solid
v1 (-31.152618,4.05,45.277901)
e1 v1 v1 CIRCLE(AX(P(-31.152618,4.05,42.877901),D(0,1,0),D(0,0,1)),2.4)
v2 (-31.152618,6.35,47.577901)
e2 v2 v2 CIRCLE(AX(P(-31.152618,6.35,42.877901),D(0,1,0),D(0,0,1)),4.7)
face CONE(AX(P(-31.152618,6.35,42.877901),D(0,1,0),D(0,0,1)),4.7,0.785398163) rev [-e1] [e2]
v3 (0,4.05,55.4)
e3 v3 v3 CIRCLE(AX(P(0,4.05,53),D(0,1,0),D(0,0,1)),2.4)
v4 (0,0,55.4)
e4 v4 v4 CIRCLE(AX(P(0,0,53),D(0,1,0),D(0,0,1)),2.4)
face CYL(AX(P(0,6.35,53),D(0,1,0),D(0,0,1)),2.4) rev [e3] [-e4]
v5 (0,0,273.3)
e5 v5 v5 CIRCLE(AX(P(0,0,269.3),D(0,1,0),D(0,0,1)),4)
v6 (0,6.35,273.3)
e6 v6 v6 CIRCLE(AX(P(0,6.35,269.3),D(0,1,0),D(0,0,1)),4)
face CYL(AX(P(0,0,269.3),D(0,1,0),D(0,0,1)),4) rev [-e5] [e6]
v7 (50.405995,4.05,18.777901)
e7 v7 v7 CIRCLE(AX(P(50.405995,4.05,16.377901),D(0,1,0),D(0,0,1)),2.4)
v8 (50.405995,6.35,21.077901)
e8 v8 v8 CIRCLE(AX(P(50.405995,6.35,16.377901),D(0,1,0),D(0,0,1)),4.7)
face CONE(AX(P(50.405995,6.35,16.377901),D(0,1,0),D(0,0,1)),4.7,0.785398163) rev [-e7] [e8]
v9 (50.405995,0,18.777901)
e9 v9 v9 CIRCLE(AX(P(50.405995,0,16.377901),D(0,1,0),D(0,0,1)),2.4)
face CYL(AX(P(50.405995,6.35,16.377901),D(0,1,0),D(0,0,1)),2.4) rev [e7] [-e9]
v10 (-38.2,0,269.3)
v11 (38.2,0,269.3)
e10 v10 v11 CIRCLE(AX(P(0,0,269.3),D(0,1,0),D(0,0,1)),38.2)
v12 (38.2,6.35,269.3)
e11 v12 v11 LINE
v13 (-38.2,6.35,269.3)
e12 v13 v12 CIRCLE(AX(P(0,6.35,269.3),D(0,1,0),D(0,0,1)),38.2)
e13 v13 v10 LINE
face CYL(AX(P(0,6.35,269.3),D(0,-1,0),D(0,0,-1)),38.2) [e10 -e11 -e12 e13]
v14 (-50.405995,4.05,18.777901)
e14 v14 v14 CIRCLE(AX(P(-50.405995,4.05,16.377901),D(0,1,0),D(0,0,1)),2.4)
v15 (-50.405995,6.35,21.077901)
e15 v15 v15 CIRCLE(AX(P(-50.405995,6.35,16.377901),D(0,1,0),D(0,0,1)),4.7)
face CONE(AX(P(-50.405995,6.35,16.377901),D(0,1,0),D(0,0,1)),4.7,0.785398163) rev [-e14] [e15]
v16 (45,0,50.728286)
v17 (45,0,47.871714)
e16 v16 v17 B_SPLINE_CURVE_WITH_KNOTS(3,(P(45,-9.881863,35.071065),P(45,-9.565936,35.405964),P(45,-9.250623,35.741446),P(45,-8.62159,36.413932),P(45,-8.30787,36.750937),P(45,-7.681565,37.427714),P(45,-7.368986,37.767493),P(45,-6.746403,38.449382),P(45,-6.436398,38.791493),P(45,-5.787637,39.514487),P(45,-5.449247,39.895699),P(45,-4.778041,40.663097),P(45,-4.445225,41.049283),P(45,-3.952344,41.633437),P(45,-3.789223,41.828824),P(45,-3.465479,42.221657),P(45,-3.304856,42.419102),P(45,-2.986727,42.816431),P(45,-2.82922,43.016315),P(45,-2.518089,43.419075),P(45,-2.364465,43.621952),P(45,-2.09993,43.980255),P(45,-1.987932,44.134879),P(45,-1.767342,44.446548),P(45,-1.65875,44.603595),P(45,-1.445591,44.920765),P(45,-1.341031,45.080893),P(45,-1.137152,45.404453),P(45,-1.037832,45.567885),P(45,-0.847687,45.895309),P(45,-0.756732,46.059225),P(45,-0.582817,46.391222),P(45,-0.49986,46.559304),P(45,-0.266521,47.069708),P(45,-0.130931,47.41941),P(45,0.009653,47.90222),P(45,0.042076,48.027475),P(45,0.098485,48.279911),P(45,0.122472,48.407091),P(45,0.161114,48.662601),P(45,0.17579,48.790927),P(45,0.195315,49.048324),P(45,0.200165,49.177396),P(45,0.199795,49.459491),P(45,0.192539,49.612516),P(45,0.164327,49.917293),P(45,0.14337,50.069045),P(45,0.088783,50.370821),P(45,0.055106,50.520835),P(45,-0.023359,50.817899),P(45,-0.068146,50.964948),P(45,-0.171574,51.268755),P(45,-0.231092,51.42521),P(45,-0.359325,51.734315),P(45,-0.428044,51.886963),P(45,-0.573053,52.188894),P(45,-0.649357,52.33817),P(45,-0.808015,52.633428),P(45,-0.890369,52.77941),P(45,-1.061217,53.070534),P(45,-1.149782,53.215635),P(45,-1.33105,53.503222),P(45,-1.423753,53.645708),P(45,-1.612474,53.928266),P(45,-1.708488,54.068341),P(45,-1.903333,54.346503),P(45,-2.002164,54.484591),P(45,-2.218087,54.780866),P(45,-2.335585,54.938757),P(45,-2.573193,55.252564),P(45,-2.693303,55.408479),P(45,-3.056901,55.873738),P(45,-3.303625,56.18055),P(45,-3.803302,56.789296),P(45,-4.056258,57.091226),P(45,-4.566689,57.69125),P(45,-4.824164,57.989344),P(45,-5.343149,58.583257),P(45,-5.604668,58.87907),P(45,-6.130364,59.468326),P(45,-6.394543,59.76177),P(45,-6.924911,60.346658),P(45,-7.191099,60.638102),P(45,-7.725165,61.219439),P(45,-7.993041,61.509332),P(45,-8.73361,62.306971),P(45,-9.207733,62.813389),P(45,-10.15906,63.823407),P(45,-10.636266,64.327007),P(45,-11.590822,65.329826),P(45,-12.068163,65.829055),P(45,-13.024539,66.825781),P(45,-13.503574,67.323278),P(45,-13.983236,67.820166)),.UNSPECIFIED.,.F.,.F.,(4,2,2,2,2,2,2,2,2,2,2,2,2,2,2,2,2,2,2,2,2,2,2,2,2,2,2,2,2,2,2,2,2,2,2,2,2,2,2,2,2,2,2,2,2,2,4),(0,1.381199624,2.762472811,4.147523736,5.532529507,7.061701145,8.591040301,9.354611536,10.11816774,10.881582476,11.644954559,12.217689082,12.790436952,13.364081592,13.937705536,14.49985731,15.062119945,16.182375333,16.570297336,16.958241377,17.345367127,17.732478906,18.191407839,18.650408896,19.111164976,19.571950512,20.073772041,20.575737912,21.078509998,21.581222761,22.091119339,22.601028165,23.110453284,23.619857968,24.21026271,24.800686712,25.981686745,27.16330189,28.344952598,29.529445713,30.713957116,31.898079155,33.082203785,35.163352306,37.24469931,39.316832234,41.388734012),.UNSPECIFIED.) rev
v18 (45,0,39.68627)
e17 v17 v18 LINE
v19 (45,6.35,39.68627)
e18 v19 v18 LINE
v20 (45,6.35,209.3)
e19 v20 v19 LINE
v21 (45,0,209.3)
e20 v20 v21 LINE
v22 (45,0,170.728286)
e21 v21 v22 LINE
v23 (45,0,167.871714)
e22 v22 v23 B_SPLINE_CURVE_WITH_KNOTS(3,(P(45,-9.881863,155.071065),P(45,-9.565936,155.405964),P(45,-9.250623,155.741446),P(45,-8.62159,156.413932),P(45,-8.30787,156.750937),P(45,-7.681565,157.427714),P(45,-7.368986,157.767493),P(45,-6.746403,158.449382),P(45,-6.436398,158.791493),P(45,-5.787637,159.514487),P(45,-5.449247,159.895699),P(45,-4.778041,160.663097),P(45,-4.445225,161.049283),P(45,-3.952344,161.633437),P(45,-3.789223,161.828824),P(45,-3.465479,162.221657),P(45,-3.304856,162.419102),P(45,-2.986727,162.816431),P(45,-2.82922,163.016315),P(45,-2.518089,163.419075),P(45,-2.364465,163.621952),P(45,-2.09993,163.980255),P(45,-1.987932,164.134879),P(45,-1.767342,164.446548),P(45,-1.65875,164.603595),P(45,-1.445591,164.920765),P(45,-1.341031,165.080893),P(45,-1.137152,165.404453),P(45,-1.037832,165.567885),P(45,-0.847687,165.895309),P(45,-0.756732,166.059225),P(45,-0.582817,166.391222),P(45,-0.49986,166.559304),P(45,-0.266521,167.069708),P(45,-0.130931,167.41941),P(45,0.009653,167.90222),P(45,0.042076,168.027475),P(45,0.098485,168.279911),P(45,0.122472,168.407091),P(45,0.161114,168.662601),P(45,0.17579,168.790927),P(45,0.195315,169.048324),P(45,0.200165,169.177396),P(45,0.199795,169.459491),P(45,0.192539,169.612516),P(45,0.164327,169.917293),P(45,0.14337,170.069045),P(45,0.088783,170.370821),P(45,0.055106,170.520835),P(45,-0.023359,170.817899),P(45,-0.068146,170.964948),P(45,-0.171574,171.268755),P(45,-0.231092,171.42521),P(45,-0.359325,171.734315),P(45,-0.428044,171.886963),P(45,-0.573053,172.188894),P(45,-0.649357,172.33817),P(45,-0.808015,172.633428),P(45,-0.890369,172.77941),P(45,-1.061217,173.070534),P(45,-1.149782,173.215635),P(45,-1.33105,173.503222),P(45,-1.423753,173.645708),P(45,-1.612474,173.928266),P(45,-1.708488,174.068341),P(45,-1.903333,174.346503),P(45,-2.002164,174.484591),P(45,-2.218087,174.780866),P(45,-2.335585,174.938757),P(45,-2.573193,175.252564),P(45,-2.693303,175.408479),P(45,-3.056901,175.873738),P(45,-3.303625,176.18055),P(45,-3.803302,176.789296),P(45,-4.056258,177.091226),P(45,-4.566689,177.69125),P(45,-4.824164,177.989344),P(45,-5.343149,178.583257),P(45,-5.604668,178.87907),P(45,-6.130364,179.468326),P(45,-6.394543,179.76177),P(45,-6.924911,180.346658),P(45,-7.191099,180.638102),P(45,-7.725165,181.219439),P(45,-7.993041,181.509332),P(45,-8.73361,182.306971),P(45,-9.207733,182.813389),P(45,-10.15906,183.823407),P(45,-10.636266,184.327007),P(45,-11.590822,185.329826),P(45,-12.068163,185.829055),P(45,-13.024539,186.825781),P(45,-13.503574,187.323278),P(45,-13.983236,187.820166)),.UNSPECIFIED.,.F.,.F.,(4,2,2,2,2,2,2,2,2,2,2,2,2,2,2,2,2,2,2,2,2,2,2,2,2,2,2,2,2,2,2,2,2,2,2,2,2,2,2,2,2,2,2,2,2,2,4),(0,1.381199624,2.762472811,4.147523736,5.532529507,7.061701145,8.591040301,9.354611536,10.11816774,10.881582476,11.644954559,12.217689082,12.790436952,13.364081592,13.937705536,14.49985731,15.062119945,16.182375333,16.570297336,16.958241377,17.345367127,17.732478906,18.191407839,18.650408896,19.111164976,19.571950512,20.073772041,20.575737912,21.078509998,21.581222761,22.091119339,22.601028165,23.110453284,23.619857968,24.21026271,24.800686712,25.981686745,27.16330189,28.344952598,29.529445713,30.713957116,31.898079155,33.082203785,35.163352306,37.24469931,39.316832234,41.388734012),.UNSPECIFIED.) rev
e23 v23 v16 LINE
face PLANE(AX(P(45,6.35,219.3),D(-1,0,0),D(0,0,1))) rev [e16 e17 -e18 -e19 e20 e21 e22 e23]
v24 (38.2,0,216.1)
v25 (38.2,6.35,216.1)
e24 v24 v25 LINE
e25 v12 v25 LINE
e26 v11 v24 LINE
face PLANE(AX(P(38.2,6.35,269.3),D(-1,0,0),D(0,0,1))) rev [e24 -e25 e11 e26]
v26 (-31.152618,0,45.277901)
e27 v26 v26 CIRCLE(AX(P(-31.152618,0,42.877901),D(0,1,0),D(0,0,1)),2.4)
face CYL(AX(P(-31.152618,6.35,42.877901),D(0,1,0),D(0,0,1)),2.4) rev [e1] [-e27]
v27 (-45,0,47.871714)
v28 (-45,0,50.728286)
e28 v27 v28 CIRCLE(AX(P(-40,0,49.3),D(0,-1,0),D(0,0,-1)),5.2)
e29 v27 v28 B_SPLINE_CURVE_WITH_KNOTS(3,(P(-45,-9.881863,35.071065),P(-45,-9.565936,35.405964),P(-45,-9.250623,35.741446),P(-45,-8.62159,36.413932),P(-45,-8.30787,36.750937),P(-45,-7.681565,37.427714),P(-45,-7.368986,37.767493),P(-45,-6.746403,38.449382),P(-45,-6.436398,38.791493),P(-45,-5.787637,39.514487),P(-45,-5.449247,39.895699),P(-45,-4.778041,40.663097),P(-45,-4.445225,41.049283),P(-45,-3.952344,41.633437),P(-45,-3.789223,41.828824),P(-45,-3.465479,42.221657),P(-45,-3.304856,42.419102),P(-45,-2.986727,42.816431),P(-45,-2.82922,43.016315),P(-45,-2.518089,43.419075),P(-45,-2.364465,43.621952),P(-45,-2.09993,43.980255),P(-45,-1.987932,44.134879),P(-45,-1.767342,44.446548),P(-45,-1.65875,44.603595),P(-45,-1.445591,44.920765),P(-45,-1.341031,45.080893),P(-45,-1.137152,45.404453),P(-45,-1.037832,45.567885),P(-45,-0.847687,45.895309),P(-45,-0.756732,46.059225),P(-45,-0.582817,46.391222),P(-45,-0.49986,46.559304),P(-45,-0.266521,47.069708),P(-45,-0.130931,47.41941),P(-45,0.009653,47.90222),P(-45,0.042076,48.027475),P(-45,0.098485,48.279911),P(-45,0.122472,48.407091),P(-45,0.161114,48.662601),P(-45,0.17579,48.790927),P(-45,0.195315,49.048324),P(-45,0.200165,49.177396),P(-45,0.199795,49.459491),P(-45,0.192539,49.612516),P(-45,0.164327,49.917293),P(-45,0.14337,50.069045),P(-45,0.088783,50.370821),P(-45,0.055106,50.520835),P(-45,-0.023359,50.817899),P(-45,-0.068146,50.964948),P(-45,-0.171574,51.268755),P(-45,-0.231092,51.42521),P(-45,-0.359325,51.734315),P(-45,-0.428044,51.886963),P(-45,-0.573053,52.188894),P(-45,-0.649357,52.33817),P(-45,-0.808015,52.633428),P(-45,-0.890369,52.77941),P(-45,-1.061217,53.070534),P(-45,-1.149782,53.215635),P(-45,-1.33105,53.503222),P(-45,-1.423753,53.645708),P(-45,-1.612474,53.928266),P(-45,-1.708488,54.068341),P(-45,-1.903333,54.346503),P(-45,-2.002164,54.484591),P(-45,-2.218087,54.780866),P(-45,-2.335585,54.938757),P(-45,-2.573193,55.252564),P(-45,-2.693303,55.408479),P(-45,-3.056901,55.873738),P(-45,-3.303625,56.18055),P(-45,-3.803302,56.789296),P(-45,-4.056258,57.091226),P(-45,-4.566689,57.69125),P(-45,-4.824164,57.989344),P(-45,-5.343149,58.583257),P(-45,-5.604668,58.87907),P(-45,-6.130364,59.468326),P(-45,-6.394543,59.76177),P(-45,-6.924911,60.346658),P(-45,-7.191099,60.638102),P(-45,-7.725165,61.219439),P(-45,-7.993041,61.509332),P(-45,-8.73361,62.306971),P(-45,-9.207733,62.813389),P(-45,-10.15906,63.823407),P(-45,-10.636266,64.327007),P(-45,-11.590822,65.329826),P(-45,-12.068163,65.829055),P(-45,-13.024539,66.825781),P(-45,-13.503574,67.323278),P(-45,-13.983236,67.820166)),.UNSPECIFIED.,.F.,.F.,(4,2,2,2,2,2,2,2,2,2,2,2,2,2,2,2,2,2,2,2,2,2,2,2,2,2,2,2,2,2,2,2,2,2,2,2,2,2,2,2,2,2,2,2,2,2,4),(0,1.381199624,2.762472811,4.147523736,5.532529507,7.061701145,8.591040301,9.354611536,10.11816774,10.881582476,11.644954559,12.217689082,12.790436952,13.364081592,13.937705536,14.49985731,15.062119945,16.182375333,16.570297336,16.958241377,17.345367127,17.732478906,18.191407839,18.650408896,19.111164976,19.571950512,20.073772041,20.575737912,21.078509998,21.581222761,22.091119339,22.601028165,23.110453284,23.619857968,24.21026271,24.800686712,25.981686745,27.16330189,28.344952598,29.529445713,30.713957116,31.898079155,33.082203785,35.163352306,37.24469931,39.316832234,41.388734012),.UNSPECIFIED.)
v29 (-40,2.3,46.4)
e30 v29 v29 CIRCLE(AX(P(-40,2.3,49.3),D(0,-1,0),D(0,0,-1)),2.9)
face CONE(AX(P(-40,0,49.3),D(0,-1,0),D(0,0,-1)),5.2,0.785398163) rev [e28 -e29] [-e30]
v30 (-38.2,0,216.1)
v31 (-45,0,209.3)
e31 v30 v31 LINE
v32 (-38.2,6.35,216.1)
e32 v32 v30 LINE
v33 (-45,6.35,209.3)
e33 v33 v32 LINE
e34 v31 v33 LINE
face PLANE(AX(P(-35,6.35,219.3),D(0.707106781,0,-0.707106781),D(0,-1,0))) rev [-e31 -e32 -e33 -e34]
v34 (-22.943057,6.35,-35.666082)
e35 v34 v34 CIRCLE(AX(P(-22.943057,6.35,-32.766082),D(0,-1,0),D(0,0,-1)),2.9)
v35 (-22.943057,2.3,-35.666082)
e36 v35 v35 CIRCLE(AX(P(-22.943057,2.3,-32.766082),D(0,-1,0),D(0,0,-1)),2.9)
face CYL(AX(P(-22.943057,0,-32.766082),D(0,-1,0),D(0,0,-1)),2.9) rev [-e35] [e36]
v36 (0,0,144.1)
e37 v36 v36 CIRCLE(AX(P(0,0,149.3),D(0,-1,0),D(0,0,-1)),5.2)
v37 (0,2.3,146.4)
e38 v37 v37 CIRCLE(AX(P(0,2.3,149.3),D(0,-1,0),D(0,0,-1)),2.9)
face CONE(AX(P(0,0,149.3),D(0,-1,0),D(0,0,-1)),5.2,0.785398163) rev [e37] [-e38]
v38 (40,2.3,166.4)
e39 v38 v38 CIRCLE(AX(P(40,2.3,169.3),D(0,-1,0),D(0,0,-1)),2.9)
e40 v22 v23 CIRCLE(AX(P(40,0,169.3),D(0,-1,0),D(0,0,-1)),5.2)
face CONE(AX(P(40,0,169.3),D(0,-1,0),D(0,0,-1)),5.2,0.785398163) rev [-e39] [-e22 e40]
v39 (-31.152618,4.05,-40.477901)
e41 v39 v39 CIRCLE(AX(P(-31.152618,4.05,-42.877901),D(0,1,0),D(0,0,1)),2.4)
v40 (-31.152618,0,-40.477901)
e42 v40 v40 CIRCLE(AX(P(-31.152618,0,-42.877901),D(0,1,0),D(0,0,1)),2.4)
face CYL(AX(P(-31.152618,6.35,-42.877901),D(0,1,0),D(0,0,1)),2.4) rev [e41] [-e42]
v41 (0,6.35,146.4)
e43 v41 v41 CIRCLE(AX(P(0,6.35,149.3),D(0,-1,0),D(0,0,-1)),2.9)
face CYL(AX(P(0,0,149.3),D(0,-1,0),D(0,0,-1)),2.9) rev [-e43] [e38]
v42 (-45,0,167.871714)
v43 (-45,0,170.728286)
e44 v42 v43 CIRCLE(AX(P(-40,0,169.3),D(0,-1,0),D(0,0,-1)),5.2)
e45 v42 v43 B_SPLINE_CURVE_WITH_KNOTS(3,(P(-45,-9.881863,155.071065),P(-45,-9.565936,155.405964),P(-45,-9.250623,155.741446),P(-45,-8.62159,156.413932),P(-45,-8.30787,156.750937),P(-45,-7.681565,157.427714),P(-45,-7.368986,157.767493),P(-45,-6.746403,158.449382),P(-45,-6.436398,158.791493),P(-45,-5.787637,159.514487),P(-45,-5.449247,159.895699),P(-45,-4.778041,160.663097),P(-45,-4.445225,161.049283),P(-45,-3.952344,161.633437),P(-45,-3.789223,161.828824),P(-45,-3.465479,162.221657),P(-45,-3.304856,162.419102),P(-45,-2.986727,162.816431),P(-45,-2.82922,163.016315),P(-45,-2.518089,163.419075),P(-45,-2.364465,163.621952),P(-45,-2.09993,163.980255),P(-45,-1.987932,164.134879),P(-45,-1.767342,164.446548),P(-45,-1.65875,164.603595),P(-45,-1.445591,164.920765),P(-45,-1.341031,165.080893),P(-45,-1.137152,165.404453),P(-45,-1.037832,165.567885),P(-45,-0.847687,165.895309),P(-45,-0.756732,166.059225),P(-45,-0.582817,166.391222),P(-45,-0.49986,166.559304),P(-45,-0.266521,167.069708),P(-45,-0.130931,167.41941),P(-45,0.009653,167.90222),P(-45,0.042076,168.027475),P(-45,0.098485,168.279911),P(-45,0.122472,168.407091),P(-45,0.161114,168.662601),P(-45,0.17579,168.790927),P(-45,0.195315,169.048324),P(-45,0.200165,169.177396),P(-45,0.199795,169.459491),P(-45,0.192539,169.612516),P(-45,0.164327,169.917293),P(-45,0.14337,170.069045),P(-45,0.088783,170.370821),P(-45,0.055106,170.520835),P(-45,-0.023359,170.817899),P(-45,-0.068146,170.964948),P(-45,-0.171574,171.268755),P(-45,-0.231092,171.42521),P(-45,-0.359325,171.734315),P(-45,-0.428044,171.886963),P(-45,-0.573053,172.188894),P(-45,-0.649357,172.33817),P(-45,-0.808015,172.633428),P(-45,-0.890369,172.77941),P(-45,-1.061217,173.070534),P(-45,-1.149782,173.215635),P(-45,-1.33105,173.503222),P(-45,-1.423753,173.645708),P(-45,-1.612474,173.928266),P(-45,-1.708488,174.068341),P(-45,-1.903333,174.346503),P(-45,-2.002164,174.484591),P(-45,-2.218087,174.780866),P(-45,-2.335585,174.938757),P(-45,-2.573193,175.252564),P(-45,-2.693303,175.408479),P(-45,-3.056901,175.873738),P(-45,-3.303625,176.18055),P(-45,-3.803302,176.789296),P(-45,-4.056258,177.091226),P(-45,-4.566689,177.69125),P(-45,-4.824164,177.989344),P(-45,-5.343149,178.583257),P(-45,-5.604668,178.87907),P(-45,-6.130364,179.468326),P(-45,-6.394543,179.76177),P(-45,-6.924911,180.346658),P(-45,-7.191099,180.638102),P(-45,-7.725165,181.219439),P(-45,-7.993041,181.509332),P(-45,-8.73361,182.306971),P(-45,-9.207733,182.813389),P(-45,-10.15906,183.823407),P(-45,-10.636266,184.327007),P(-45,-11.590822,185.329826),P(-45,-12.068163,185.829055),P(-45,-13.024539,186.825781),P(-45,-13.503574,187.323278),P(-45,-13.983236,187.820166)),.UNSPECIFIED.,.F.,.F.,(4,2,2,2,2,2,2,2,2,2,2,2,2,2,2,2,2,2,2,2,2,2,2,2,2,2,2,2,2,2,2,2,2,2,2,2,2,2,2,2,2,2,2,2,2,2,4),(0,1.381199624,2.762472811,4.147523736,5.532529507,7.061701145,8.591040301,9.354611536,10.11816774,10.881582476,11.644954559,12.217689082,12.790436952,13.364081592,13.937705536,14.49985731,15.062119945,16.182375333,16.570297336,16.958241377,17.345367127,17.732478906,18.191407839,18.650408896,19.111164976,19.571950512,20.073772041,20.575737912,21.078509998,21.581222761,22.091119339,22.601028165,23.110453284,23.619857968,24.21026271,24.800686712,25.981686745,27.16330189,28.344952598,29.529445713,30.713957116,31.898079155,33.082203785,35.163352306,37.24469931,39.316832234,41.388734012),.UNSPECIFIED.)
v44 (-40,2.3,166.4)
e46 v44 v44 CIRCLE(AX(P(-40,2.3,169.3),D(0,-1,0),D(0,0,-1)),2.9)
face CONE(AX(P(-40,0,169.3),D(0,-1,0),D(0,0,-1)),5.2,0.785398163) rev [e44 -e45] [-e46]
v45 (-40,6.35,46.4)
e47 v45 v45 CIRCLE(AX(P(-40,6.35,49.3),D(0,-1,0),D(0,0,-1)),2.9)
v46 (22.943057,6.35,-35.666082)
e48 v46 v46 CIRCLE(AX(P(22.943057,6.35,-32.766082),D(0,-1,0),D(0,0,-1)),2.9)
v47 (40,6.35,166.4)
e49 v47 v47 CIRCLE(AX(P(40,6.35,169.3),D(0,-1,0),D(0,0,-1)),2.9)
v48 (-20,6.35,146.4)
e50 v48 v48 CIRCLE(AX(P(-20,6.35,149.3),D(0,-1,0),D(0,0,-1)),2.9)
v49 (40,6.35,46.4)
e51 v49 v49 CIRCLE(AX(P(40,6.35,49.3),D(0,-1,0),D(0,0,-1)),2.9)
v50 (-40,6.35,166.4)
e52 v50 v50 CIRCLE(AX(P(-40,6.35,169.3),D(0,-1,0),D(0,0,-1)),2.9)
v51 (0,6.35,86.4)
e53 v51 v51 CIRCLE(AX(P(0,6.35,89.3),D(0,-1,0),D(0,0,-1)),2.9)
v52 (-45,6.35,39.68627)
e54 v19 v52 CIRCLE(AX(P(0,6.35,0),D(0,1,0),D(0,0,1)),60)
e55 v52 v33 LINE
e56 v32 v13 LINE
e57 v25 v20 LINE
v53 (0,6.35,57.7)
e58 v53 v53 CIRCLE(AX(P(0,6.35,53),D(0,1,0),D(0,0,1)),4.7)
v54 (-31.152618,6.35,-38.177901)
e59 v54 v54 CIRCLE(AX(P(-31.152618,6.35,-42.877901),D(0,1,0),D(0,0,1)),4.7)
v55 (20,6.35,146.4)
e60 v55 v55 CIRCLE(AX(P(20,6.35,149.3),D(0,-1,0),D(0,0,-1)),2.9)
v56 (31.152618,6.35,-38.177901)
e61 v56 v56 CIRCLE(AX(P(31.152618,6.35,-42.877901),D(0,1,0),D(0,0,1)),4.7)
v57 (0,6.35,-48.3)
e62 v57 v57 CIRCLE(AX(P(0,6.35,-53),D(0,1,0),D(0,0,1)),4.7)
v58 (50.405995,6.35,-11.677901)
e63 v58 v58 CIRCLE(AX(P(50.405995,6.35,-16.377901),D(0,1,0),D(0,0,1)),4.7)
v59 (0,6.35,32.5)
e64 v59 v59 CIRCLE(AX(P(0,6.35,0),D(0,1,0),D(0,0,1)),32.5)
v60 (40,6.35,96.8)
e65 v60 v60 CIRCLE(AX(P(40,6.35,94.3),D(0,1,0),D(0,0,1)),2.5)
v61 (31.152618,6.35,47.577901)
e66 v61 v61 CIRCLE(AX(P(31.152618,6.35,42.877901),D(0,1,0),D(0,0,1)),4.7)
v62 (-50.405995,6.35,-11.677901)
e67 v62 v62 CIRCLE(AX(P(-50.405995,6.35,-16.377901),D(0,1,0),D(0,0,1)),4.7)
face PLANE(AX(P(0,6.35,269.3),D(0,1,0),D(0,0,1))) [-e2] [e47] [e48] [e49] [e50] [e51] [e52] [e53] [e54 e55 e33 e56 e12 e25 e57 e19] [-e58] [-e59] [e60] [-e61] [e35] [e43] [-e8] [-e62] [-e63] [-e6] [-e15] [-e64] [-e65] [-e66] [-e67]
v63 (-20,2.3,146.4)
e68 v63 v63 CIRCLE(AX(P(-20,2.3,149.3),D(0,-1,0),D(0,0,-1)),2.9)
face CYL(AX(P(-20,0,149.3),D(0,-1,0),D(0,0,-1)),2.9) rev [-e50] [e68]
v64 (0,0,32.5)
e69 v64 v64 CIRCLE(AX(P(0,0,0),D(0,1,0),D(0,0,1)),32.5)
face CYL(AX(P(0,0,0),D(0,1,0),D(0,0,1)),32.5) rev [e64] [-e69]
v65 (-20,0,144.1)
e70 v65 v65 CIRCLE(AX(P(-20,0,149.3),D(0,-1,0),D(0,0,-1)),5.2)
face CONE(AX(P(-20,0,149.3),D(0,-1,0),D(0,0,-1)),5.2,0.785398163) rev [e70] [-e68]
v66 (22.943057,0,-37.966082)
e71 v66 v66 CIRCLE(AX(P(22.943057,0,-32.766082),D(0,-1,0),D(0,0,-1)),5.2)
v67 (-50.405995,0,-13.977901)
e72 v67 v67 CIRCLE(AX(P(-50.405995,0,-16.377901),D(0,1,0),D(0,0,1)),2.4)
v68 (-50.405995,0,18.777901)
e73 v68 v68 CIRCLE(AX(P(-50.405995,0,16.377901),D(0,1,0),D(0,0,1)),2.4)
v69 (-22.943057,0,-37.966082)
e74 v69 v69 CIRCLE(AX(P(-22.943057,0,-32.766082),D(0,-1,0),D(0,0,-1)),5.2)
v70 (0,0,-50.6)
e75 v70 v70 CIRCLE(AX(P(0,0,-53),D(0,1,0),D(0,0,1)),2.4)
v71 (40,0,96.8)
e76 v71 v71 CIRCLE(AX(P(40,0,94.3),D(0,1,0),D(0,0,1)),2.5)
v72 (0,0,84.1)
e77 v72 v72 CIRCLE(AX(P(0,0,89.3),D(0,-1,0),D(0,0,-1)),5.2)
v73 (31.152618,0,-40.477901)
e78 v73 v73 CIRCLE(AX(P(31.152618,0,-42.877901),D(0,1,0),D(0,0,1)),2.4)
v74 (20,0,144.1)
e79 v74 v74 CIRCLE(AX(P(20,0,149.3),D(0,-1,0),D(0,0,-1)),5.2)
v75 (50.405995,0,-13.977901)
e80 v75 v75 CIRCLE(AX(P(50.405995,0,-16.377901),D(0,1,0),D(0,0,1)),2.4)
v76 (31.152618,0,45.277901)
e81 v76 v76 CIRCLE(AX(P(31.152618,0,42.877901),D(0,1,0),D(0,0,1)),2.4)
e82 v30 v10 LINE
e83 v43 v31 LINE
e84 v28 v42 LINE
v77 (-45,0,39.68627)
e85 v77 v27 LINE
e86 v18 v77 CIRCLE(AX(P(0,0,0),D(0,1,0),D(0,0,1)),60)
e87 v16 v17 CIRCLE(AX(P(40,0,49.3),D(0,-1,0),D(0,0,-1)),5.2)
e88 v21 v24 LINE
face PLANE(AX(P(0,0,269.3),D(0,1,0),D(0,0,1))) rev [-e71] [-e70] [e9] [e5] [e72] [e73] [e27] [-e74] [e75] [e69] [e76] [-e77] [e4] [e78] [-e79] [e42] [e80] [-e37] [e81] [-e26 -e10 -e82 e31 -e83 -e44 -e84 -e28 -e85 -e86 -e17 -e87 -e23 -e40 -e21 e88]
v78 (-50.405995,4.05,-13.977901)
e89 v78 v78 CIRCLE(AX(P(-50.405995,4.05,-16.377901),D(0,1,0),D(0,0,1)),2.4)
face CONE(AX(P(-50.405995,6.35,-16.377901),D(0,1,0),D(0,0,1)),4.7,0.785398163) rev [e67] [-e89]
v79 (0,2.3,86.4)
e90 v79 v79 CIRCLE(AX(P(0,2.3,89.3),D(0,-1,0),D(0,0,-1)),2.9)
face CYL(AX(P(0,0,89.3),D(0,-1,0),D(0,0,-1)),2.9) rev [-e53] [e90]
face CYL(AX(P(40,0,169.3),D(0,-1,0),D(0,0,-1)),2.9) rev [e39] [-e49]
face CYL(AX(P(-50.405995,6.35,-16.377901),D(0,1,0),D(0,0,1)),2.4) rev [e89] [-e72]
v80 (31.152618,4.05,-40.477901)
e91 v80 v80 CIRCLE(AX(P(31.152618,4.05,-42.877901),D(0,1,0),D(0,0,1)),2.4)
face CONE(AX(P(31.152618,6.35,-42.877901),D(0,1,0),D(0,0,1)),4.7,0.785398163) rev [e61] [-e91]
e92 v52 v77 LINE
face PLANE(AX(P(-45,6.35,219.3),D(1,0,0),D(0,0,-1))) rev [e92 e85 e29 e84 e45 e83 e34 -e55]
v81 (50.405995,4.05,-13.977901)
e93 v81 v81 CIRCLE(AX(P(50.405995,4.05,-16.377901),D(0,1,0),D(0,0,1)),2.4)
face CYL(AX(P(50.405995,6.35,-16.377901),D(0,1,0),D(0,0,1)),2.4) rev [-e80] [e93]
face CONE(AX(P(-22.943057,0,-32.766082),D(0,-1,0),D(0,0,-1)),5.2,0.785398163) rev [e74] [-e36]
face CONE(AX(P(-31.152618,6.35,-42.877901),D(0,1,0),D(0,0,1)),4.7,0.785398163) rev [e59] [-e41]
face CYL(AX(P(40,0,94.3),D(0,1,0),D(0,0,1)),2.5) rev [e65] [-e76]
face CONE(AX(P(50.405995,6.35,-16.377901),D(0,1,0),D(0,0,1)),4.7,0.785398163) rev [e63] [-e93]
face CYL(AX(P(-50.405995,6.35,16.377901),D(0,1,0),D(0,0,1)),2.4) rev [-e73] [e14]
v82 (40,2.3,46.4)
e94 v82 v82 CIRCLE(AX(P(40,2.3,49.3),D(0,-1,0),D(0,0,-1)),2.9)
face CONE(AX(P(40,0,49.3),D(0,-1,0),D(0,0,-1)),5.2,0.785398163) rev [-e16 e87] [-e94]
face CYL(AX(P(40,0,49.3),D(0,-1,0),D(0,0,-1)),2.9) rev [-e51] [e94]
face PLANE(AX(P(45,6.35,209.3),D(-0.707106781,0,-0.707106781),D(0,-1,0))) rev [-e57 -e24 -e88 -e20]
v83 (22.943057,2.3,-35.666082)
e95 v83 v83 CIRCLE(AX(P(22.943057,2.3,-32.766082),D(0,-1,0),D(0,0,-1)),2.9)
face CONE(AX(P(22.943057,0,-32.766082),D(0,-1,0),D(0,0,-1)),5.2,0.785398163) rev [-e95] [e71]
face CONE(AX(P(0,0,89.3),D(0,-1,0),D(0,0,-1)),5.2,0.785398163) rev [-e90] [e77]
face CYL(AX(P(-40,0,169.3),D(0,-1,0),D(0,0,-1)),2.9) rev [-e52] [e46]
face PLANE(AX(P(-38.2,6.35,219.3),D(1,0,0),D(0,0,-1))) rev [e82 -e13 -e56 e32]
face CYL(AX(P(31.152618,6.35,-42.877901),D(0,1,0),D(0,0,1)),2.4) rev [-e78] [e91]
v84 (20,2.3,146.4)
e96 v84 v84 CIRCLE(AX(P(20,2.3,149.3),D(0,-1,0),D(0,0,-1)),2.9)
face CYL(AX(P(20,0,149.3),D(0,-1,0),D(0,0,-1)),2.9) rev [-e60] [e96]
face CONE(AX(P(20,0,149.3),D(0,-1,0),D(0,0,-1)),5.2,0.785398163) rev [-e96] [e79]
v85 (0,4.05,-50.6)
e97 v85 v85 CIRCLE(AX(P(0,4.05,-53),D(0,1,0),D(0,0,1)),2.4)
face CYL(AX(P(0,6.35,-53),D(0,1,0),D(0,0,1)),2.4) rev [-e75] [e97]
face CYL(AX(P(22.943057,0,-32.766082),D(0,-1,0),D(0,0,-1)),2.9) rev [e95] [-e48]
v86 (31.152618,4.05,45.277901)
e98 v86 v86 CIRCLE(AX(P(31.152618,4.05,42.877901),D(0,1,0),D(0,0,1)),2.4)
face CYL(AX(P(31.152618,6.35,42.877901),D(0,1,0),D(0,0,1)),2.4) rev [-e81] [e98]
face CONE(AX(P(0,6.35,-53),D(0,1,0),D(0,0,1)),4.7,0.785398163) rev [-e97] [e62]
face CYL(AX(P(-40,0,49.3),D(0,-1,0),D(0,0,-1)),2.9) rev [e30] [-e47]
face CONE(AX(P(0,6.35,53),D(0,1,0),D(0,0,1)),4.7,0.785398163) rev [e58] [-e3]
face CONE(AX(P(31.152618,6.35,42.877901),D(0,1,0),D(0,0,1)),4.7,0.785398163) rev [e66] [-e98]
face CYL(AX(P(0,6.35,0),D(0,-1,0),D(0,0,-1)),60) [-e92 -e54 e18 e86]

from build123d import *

# Parameters (mm, degrees)
BOSS_EXTRUDE1_DEPTH                             = 6.35
SKETCH2_R                                       = 2
SKETCH2_R_2                                     = 32.5
SKETCH2_R_3                                     = 4
SKETCH2_R_4                                     = 2.5
CUT_EXTRUDE1_DEPTH                              = 314.363323476
CHAMFER1_SIZE                                   = 10
CSK_FOR_M4_OVAL_HEAD_MACHINE_SCREW1_D           = 4.8
CSK_FOR_M4_OVAL_HEAD_MACHINE_SCREW1_CSINK_D     = 9.4
CSK_FOR_M4_OVAL_HEAD_MACHINE_SCREW1_CSINK_ANGLE = 90
CSK_FOR_M5_OVAL_HEAD_MACHINE_SCREW1_D           = 5.8
CSK_FOR_M5_OVAL_HEAD_MACHINE_SCREW1_CSINK_D     = 10.4
CSK_FOR_M5_OVAL_HEAD_MACHINE_SCREW1_CSINK_ANGLE = 90


with BuildPart() as part:
    # Sketch1 → Boss-Extrude1 (new body)
    with BuildSketch(Plane(origin=(0, 0, 0), x_dir=(1, 0, 0), z_dir=(0, 1, 0))):
        with BuildLine():
            Line((-45, -219.3), (-38.2, -219.3))
            Line((-38.2, -219.3), (-38.2, -269.3))
            ThreePointArc((-38.2, -269.3), (0, -307.5), (38.2, -269.3))
            Line((38.2, -269.3), (38.2, -219.3))
            Line((38.2, -219.3), (45, -219.3))
            Line((45, -219.3), (45, -39.686269666))
            ThreePointArc((45, -39.686269666), (0, 60), (-45, -39.686269666))
            Line((-45, -39.686269666), (-45, -219.3))
        make_face()
    extrude(amount=BOSS_EXTRUDE1_DEPTH)

    # Sketch2 → Cut-Extrude1 (cut, through all)
    with BuildSketch(Plane(origin=(0, 6.35, 0), x_dir=(1, 0, 0), z_dir=(0, 1, 0))):
        with Locations(Location((0, 53, 0), (0, 0, 270))):
            Circle(SKETCH2_R)
        with Locations(Location((31.152618372, 42.877900702, 0), (0, 0, 270))):
            Circle(SKETCH2_R)
        with Locations(Location((50.405995364, 16.377900702, 0), (0, 0, 270))):
            Circle(SKETCH2_R)
        with Locations(Location((50.405995364, -16.377900702, 0), (0, 0, 270))):
            Circle(SKETCH2_R)
        with Locations(Location((31.152618372, -42.877900702, 0), (0, 0, 270))):
            Circle(SKETCH2_R)
        with Locations(Location((0, -53, 0), (0, 0, 270))):
            Circle(SKETCH2_R)
        with Locations(Location((-31.152618371, -42.877900702, 0), (0, 0, 270))):
            Circle(SKETCH2_R)
        with Locations(Location((-50.405995364, -16.377900702, 0), (0, 0, 270))):
            Circle(SKETCH2_R)
        with Locations(Location((-50.405995364, 16.377900702, 0), (0, 0, 270))):
            Circle(SKETCH2_R)
        with Locations(Location((-31.152618371, 42.877900702, 0), (0, 0, 270))):
            Circle(SKETCH2_R)
        with Locations(Location((0, 0, 0), (0, 0, 270))):
            Circle(SKETCH2_R_2)
        with Locations(Location((0, -269.3, 0), (0, 0, 270))):
            Circle(SKETCH2_R_3)
        with Locations(Location((-40, -169.3, 0), (0, 0, 270))):
            Circle(SKETCH2_R_4)
        with Locations(Location((-40, -49.3, 0), (0, 0, 270))):
            Circle(SKETCH2_R_4)
        with Locations(Location((40, -169.3, 0), (0, 0, 90))):
            Circle(SKETCH2_R_4)
        with Locations(Location((40, -49.3, 0), (0, 0, 90))):
            Circle(SKETCH2_R_4)
        with Locations(Location((0, -89.3, 0), (0, 0, 270))):
            Circle(SKETCH2_R_4)
        with Locations(Location((-20, -149.3, 0), (0, 0, 270))):
            Circle(SKETCH2_R_4)
        with Locations(Location((0, -149.3, 0), (0, 0, 270))):
            Circle(SKETCH2_R_4)
        with Locations(Location((20, -149.3, 0), (0, 0, 270))):
            Circle(SKETCH2_R_4)
        with Locations(Location((-22.943057454, 32.766081772, 0), (0, 0, 270))):
            Circle(SKETCH2_R_4)
        with Locations(Location((22.943057454, 32.766081772, 0), (0, 0, 270))):
            Circle(SKETCH2_R_4)
        with Locations(Location((40, -94.3, 0), (0, 0, 270))):
            Circle(SKETCH2_R_4)
    extrude(amount=-CUT_EXTRUDE1_DEPTH, mode=Mode.SUBTRACT)

    # Chamfer1
    # the kernel refuses this chamfer: 10 mm, written as the material it takes off along each edge
    with BuildSketch(Plane(origin=(45, -25.71682988, 219.3), x_dir=(0.027495876610586282, 0, -0.9996219169112968), z_dir=(0, 1, 0))) as chamfer1_piece_1_section:
        Polygon((CHAMFER1_SIZE * 0.999621916911, CHAMFER1_SIZE * 0.0274958766106), (-CHAMFER1_SIZE * 0.0274958766106, CHAMFER1_SIZE * 0.999621916911), (0, 0), align=None)
    chamfer1_piece_1 = extrude(amount=57.783659759, mode=Mode.PRIVATE)
    chamfer1_piece_1 = split(chamfer1_piece_1, bisect_by=Plane(origin=(38.2, 3.175, 215.680305009), z_dir=(1, 0, 0)), keep=Keep.TOP, mode=Mode.PRIVATE)
    add(chamfer1_piece_1, mode=Mode.SUBTRACT)
    with BuildSketch(Plane(origin=(-45, -25.71682988, 219.3), x_dir=(-0.027495876610586282, 0, -0.9996219169112968), z_dir=(0, 1, 0))) as chamfer1_piece_2_section:
        Polygon((CHAMFER1_SIZE * 0.999621916911, -CHAMFER1_SIZE * 0.0274958766106), (-CHAMFER1_SIZE * 0.0274958766106, -CHAMFER1_SIZE * 0.999621916911), (0, 0), align=None)
    chamfer1_piece_2 = extrude(amount=57.783659759, mode=Mode.PRIVATE)
    chamfer1_piece_2 = split(chamfer1_piece_2, bisect_by=Plane(origin=(-38.2, 3.175, 215.680305009), z_dir=(-1, 0, 0)), keep=Keep.TOP, mode=Mode.PRIVATE)
    add(chamfer1_piece_2, mode=Mode.SUBTRACT)

    # CSK for M4 Oval Head Machine Screw1 (through all)
    with Locations(Plane(origin=(-50.405995364, 6.35, 16.377900702), x_dir=(0, 0, 1), z_dir=(0, 1, 0))):
        with Locations((0, 0), (-32.755801404, 0), (-59.255801404, 19.253376993), (-69.377900702, 50.405995364), (-59.255801404, 81.558613736), (-32.755801404, 100.811990728), (0, 100.811990728), (26.5, 81.558613736), (36.622099298, 50.405995364), (26.5, 19.253376993)):
            CounterSinkHole(CSK_FOR_M4_OVAL_HEAD_MACHINE_SCREW1_D / 2, CSK_FOR_M4_OVAL_HEAD_MACHINE_SCREW1_CSINK_D / 2, counter_sink_angle=CSK_FOR_M4_OVAL_HEAD_MACHINE_SCREW1_CSINK_ANGLE)

    # CSK for M5 Oval Head Machine Screw1 (through all)
    with Locations(Plane(origin=(22.943057454, 0, -32.766081772), x_dir=(0, 0, -1), z_dir=(0, -1, 0))):
        with Locations((0, 0), (0, -45.886114908), (-122.066081772, -22.943057454), (-82.066081772, 17.056942546), (-82.066081772, -62.943057454), (-202.066081772, -62.943057454), (-202.066081772, 17.056942546), (-182.066081772, -2.943057454), (-182.066081772, -22.943057454), (-182.066081772, -42.943057454)):
            CounterSinkHole(CSK_FOR_M5_OVAL_HEAD_MACHINE_SCREW1_D / 2, CSK_FOR_M5_OVAL_HEAD_MACHINE_SCREW1_CSINK_D / 2, counter_sink_angle=CSK_FOR_M5_OVAL_HEAD_MACHINE_SCREW1_CSINK_ANGLE)


solid = part.part
